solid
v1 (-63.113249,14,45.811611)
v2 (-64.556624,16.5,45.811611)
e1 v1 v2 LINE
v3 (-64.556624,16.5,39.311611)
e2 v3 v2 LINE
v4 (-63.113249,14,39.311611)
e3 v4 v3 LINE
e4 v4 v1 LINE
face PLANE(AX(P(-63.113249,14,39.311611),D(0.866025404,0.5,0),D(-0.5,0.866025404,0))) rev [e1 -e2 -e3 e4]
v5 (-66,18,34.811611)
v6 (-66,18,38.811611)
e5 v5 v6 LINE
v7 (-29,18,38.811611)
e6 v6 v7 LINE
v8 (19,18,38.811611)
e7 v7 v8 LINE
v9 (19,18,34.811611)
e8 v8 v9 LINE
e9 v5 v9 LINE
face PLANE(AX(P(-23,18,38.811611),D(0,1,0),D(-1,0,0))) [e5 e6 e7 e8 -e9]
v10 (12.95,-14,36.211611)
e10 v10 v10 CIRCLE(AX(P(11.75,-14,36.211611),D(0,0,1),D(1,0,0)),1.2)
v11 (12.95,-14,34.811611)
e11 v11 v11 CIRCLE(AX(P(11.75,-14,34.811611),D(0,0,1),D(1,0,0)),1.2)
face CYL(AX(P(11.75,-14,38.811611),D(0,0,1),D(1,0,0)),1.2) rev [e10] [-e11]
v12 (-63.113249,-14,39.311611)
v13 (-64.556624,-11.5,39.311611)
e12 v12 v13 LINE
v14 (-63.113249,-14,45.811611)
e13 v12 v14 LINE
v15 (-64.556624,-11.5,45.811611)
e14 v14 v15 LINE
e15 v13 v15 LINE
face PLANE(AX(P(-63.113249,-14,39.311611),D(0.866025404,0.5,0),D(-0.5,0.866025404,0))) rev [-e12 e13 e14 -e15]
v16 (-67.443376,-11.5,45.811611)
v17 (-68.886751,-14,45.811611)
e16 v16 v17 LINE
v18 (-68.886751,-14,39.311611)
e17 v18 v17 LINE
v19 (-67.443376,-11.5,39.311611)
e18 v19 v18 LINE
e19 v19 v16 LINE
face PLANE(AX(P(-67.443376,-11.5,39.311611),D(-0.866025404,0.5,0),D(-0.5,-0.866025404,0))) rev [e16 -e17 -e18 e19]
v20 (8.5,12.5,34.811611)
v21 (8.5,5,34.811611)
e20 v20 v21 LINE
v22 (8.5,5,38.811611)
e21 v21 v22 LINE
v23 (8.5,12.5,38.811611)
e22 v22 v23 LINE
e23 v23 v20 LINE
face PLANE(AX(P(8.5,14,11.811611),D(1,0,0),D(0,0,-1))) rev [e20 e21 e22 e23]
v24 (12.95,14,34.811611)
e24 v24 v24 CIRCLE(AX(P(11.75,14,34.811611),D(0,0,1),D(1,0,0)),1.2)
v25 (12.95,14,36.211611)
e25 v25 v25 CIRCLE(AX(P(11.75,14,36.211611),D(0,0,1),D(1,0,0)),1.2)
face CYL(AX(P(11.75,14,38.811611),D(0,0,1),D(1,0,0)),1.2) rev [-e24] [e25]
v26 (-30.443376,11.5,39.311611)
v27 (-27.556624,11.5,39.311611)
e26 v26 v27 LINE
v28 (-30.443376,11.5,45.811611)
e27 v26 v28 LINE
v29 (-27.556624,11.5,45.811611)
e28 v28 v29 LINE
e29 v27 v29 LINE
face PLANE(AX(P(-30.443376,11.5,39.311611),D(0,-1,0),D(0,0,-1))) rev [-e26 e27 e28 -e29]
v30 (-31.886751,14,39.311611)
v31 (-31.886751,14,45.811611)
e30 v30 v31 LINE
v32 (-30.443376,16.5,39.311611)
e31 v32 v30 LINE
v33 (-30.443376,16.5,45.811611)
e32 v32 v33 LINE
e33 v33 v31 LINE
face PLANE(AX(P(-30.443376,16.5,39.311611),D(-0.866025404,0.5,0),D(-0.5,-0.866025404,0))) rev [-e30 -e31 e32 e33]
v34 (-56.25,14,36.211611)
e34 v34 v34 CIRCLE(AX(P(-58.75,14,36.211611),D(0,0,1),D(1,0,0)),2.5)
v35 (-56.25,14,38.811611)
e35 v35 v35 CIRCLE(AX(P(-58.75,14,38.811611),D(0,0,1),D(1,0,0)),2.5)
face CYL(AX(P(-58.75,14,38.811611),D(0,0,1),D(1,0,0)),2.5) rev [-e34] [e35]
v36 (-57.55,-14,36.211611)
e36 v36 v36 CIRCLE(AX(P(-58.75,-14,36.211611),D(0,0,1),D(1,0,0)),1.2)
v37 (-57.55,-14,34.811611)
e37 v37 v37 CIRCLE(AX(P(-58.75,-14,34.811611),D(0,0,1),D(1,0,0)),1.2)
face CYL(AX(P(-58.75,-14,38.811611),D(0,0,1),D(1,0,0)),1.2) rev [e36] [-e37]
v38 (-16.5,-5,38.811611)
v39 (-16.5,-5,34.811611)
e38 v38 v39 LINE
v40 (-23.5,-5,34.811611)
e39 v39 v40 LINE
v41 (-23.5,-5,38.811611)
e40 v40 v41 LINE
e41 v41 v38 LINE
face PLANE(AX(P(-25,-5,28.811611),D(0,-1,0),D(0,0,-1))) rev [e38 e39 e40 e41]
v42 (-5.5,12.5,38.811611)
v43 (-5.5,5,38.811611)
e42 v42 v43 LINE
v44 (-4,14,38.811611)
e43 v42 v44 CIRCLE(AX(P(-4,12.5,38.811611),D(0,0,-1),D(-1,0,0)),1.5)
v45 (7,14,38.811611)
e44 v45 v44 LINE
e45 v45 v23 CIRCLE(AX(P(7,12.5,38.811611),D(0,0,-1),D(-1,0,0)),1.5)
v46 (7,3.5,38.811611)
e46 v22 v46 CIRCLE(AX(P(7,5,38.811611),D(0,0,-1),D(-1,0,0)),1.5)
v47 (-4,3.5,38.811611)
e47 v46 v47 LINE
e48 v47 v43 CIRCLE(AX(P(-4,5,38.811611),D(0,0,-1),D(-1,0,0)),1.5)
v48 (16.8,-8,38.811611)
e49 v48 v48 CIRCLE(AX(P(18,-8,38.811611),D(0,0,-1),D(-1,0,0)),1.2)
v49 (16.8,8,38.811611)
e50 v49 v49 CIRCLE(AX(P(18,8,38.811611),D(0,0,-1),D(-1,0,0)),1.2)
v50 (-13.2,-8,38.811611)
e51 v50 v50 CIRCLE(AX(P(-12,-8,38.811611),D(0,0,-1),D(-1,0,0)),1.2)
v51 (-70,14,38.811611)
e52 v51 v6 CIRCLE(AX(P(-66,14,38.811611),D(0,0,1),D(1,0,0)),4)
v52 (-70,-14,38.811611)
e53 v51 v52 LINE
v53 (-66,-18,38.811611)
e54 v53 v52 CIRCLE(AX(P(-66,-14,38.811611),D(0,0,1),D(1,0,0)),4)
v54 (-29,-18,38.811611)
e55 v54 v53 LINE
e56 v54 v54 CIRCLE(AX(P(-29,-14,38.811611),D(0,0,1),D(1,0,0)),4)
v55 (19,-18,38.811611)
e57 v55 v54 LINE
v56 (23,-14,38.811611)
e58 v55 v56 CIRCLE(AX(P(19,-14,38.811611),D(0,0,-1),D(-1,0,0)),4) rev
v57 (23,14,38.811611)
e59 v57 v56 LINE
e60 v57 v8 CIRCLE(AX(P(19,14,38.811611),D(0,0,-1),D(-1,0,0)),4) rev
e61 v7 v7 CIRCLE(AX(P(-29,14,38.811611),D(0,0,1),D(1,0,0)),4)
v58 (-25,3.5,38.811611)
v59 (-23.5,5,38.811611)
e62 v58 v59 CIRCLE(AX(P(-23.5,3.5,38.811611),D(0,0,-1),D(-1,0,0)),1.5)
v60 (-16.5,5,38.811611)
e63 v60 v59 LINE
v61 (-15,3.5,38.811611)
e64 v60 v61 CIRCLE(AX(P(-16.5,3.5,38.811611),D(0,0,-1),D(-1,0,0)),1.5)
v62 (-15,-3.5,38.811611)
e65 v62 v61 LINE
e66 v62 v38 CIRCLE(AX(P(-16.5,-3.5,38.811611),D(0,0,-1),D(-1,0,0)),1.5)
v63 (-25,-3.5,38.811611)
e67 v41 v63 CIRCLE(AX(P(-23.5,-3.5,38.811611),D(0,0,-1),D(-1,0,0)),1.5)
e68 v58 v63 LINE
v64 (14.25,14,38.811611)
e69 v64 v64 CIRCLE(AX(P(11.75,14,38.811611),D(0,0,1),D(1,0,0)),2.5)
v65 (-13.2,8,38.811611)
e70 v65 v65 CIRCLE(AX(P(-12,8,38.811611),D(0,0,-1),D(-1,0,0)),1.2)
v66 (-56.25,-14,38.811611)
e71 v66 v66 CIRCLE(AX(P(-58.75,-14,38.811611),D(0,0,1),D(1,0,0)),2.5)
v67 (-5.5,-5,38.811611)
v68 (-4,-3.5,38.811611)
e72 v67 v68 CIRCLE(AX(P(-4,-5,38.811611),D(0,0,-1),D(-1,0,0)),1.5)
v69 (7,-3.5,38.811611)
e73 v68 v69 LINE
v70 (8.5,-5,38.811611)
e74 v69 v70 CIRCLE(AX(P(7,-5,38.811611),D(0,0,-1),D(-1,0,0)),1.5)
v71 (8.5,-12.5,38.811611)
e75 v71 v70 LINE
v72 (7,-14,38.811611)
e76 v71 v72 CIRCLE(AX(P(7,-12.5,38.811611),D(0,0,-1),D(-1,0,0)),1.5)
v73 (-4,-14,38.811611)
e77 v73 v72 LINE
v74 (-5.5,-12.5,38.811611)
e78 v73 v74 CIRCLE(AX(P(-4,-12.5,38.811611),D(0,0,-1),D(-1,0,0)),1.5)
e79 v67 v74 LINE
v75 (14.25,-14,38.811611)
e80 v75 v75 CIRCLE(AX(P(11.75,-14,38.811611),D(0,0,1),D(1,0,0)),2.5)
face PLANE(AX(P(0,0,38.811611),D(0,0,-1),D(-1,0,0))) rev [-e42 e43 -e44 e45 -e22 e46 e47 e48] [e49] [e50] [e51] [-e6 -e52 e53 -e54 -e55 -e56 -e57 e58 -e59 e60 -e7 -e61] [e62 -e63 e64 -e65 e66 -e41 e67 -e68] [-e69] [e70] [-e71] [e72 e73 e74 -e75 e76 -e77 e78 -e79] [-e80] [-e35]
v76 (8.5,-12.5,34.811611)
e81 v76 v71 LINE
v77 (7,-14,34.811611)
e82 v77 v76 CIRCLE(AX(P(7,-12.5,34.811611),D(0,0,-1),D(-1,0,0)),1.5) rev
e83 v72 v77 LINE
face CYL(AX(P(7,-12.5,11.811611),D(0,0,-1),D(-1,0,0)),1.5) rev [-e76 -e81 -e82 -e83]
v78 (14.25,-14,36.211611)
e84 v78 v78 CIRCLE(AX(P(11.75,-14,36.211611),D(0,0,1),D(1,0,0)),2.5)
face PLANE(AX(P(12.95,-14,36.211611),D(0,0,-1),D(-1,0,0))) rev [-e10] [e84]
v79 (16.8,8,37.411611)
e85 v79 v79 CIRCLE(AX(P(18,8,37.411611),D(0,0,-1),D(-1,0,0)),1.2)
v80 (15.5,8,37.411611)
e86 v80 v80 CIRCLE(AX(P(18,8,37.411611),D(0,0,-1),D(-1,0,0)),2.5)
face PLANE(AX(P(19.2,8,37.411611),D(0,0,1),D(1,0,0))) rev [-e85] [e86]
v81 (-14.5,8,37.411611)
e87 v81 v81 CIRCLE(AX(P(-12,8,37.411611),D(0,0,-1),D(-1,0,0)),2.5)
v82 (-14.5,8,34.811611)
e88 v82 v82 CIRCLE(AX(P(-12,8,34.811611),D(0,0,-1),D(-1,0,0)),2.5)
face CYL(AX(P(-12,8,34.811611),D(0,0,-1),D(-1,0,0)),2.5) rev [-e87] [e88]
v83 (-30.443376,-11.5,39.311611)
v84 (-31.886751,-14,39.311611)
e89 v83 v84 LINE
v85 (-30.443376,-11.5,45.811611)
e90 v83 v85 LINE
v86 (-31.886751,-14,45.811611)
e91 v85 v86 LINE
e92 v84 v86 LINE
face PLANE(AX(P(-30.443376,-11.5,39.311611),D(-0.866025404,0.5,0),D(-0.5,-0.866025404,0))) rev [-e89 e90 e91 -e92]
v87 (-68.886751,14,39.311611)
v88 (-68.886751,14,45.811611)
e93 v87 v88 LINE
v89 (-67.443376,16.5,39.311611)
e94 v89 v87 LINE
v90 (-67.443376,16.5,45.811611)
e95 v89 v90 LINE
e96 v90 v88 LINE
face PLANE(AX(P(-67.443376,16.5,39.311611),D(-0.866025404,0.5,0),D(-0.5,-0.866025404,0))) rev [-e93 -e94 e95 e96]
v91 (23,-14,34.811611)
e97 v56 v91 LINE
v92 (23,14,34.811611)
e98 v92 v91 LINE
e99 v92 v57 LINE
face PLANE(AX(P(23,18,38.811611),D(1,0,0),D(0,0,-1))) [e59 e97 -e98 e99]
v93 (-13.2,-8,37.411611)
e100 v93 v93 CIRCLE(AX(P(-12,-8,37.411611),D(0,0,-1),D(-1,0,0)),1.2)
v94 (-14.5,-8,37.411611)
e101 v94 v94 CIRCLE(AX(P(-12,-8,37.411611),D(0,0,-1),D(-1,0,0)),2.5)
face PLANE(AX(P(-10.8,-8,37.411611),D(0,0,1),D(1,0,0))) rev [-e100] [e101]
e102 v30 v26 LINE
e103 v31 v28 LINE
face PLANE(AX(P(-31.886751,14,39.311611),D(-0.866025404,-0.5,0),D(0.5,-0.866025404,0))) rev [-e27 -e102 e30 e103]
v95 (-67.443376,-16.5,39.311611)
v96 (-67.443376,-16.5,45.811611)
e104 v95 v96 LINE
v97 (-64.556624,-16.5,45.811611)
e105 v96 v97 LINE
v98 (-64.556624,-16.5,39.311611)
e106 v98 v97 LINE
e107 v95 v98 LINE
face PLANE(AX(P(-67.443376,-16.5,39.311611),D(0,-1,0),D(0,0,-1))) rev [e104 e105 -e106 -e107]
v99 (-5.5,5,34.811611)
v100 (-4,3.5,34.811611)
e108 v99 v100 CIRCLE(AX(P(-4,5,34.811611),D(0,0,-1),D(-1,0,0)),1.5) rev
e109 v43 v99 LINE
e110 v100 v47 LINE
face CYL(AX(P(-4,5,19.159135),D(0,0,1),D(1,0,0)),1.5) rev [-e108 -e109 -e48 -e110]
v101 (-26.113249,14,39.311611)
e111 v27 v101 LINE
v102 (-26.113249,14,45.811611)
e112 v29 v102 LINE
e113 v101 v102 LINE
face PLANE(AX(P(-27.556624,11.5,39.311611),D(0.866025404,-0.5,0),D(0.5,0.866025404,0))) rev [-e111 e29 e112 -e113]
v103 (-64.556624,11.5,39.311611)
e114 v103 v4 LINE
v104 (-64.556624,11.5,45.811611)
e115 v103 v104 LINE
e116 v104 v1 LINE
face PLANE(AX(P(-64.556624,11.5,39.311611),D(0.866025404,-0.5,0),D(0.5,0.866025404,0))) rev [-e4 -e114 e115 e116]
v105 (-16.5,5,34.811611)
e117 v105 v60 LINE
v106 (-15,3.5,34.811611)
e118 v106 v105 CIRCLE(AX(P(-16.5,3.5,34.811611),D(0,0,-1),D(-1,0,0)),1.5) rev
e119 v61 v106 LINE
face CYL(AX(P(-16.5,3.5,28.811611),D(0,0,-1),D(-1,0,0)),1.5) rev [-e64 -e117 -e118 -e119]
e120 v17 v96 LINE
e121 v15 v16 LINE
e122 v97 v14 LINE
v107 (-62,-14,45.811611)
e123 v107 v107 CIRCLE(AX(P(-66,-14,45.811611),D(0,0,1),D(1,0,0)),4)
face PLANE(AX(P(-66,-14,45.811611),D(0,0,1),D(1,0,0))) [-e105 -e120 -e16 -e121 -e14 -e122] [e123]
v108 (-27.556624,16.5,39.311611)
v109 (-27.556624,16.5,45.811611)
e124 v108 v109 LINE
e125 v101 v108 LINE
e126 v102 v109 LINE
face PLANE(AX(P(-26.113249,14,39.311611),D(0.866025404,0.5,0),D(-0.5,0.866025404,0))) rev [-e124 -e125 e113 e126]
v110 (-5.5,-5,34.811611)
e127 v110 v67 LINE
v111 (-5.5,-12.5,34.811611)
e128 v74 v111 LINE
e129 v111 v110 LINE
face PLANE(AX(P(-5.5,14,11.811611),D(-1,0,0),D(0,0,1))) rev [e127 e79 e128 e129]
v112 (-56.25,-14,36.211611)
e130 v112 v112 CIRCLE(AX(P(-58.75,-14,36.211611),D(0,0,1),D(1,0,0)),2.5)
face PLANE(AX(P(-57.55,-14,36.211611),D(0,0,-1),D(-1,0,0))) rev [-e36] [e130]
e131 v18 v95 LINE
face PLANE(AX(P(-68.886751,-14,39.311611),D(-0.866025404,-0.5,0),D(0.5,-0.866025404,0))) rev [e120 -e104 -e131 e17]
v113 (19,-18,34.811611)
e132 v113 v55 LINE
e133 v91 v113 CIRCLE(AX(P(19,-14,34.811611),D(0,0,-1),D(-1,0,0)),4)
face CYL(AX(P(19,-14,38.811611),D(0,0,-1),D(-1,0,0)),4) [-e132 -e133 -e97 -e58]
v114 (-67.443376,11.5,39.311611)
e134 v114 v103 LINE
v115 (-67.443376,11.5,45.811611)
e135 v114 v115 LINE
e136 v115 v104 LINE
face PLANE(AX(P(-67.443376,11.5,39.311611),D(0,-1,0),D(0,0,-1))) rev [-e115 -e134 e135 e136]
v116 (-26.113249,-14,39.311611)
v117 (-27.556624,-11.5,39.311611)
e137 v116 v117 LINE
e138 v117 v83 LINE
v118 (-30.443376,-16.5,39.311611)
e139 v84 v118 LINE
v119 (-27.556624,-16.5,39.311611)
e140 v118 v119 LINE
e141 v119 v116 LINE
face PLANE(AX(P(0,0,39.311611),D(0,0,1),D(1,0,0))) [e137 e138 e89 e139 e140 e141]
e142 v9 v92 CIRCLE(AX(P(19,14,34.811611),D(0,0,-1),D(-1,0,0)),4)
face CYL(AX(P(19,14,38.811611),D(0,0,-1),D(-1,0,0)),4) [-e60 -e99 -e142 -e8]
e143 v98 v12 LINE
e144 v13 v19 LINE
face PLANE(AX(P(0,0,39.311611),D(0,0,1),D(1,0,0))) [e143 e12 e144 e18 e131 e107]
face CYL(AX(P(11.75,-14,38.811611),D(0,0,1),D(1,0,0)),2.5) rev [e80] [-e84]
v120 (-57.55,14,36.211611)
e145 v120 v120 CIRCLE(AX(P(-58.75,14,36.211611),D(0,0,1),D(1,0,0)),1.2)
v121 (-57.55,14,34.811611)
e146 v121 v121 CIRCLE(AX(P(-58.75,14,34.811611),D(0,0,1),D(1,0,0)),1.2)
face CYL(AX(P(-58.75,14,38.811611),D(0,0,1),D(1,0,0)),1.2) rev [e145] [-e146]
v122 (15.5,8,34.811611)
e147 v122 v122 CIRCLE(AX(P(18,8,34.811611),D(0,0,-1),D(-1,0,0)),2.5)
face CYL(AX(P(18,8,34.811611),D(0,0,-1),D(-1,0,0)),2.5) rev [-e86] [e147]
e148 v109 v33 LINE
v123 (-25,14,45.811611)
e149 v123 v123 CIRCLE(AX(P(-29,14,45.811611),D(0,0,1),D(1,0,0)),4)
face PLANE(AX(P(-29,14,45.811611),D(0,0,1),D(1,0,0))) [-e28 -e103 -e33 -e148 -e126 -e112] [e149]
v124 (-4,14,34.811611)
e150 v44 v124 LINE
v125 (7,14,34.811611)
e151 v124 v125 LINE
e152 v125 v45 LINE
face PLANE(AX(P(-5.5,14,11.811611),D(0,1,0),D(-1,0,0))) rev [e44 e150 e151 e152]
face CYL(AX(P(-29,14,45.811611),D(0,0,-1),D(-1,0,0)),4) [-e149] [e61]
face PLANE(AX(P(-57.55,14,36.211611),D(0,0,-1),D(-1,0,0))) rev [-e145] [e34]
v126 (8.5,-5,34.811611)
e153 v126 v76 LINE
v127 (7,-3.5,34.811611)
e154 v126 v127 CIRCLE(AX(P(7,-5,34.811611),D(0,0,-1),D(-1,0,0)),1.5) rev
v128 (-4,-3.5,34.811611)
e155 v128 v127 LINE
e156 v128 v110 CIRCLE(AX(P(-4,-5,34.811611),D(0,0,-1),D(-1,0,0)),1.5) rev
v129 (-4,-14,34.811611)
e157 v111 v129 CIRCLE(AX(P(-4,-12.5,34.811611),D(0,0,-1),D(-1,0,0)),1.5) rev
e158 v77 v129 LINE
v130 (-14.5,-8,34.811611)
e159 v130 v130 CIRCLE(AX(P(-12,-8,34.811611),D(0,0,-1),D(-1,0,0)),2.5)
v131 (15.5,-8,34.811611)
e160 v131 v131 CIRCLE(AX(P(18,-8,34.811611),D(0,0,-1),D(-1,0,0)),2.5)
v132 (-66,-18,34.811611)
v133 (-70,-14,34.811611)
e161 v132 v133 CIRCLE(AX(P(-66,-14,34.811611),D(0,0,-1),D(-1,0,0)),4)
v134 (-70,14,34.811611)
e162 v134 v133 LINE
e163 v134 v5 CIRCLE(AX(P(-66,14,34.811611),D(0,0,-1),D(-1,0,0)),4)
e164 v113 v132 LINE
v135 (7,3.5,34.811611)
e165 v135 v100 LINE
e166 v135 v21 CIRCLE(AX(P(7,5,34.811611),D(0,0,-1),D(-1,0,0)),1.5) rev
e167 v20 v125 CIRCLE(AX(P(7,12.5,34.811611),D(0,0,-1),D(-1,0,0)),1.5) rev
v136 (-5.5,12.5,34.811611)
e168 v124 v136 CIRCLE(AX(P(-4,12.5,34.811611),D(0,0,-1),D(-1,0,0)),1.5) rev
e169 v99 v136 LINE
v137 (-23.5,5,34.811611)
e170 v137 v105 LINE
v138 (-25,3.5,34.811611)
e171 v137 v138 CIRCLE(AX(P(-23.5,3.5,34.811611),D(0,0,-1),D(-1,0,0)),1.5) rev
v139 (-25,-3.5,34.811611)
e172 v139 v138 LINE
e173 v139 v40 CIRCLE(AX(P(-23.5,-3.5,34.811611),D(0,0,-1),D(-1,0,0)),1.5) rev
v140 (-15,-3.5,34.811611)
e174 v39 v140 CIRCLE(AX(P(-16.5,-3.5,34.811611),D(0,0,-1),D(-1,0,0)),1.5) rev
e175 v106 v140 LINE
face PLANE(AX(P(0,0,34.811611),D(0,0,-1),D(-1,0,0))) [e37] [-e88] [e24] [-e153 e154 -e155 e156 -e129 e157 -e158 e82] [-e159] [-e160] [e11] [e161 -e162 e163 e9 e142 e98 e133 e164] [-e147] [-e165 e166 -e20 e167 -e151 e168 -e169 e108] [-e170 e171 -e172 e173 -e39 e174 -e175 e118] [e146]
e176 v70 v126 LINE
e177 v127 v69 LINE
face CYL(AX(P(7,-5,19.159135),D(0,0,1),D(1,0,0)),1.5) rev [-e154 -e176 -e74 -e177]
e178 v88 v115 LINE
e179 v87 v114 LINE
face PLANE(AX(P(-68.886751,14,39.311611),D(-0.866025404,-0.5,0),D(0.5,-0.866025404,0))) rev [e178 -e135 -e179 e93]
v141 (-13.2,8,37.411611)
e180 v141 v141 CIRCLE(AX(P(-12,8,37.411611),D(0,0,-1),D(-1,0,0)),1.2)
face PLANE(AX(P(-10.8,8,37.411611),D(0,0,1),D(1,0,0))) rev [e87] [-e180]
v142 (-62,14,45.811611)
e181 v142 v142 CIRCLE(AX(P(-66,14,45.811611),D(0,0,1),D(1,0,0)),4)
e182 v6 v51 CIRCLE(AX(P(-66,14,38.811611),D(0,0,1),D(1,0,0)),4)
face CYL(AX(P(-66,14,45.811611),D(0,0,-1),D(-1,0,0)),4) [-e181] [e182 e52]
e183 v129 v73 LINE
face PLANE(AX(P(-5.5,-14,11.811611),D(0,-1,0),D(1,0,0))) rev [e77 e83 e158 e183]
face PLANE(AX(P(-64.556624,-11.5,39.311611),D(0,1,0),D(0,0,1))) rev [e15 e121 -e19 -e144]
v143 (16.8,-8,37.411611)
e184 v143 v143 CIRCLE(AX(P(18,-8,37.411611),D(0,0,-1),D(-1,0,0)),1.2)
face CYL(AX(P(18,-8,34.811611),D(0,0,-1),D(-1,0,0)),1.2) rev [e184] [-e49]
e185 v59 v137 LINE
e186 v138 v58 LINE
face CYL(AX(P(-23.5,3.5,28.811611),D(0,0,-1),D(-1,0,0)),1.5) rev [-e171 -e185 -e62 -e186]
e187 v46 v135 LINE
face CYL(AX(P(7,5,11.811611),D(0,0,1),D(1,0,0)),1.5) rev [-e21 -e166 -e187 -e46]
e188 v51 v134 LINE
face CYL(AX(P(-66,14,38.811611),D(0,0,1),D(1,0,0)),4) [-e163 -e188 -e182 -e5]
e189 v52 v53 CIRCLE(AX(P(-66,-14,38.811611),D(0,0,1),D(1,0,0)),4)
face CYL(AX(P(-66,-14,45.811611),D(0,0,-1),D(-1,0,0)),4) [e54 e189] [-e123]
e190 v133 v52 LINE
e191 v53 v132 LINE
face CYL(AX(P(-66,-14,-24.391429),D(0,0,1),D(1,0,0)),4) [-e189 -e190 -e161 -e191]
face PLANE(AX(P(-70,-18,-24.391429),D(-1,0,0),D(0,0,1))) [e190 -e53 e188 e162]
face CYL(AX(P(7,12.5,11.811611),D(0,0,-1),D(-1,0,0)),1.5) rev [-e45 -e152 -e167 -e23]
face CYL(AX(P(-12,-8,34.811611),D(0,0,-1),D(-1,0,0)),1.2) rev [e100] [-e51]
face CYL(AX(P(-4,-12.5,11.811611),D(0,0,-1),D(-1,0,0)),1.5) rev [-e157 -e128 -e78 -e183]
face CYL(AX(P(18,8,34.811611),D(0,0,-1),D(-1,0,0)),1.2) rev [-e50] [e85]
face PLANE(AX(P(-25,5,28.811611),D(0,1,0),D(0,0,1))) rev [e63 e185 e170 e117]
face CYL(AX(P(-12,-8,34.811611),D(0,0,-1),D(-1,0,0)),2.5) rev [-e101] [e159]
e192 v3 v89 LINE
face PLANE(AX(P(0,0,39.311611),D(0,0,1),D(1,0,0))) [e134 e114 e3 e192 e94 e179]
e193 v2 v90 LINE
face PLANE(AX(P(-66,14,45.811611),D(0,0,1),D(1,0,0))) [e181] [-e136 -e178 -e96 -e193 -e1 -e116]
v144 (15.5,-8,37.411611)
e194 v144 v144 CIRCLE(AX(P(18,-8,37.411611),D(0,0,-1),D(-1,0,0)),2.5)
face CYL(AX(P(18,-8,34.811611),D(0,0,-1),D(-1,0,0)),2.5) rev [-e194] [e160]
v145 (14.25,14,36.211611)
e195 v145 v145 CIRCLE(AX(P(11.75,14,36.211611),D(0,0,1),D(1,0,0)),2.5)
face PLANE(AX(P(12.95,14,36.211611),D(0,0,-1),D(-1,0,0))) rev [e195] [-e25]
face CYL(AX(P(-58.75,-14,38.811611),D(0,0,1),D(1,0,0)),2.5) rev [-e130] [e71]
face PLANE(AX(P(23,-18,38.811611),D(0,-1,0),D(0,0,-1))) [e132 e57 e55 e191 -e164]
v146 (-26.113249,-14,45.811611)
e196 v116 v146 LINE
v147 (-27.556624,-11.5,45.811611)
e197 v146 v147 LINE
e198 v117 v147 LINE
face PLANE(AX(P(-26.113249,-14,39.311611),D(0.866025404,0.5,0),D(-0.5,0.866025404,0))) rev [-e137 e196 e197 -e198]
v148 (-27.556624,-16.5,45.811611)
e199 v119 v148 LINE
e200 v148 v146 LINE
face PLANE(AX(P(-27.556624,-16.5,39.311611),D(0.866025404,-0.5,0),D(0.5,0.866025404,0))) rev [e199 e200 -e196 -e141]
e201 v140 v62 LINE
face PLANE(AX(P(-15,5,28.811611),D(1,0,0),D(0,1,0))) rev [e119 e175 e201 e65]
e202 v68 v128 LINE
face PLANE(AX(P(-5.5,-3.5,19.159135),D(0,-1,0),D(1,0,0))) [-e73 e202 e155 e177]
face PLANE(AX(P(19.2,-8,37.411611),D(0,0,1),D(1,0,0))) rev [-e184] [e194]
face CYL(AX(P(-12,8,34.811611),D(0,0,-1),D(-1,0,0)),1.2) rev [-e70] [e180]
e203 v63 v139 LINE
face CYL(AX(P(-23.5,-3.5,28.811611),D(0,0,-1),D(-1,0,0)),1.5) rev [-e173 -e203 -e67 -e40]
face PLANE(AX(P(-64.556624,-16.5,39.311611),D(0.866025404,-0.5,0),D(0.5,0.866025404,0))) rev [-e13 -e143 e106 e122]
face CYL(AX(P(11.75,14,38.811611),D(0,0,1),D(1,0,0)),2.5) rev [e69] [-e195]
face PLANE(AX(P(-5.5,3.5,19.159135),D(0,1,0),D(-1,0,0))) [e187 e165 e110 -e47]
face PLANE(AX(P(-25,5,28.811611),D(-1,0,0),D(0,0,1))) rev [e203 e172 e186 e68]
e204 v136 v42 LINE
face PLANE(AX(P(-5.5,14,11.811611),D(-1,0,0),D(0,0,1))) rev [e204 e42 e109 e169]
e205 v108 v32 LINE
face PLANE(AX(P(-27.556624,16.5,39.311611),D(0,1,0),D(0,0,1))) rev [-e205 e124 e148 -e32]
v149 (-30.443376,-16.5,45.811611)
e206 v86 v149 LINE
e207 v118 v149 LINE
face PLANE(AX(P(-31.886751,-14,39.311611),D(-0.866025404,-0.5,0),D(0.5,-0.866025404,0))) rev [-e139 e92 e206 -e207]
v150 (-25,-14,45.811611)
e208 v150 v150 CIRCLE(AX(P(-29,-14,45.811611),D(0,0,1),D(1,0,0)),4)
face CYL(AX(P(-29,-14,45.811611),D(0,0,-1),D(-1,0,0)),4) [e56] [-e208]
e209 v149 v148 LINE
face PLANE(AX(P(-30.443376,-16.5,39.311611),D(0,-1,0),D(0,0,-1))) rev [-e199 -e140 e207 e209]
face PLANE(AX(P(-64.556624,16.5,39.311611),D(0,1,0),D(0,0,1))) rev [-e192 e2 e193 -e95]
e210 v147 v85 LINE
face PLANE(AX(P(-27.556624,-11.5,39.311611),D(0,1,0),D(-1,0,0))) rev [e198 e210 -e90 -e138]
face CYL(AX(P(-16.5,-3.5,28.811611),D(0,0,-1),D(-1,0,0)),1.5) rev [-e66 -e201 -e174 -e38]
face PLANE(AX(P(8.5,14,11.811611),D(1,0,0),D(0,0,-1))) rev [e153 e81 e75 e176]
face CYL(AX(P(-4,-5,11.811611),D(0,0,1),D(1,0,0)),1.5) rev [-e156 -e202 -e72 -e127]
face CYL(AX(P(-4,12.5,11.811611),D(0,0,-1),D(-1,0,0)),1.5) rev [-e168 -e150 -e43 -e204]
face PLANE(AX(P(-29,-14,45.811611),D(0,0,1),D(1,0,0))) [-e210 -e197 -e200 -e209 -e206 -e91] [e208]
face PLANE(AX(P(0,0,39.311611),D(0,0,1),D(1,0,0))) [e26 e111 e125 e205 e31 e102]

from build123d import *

# Parameters (mm, degrees)
SKETCH1_W                                        = 46
SKETCH1_H                                        = 36
BOSS_EXTRUDE1_DEPTH                              = 4
CBORE_FOR_M2_PAN_HEAD_MACHINE_SCREW1_D           = 2.4
CBORE_FOR_M2_PAN_HEAD_MACHINE_SCREW1_CBORE_D     = 5
CBORE_FOR_M2_PAN_HEAD_MACHINE_SCREW1_CBORE_DEPTH = 2.6
SKETCH6_W                                        = 47
SKETCH6_H                                        = 36
BOSS_EXTRUDE2_DEPTH                              = 4
SKETCH7_R                                        = 4
BOSS_EXTRUDE3_DEPTH                              = 7
CUT_EXTRUDE3_DEPTH                               = 6.5
FILLET3_R                                        = 4
SKETCH13_W                                       = 14
SKETCH13_H                                       = 28
CUT_EXTRUDE5_DEPTH                               = 27
SKETCH16_W                                       = 14
SKETCH16_H                                       = 7
BOSS_EXTRUDE4_DEPTH                              = 4
SKETCH17_W                                       = 10
SKETCH17_H                                       = 10
CUT_EXTRUDE6_DEPTH                               = 10
FILLET4_R                                        = 1.5
CBORE_START                                      = 36.211611197
CBORE_FOR_M2_PAN_HEAD_MACHINE_SCREW2_OUT_R       = 2.5
CBORE_FOR_M2_PAN_HEAD_MACHINE_SCREW2_DEPTH       = 2.6
CBORE_START_2                                    = 34.811611197
CBORE_FOR_M2_PAN_HEAD_MACHINE_SCREW2_2_O_R       = 1.2
CBORE_FOR_M2_PAN_HEAD_MACHINE_SCREW2_2_DEPTH     = 1.4


# Read off the part's stored shape, not the designer's step: CBORE for M2 Pan Head Machine Screw2
with BuildPart() as part:
    # Sketch1 → Boss-Extrude1 (new body)
    with BuildSketch(Plane(origin=(0, 0, 34.811611197), x_dir=(-1, 0, 0), z_dir=(0, 0, -1))):
        Rectangle(SKETCH1_W, SKETCH1_H)
    extrude(amount=-BOSS_EXTRUDE1_DEPTH)

    # CBORE for M2 Pan Head Machine Screw1 (through all)
    with Locations(Plane(origin=(0, 0, 34.811611197), x_dir=(-1, 0, 0), z_dir=(0, 0, -1))):
        with Locations((12, -8), (-18, -8), (-18, 8), (12, 8)):
            CounterBoreHole(CBORE_FOR_M2_PAN_HEAD_MACHINE_SCREW1_D / 2, CBORE_FOR_M2_PAN_HEAD_MACHINE_SCREW1_CBORE_D / 2, CBORE_FOR_M2_PAN_HEAD_MACHINE_SCREW1_CBORE_DEPTH)

    # Sketch6 → Boss-Extrude2 (add)
    with BuildSketch(Plane.XY.offset(38.811611197)):
        with Locations((-46.5, 0)):
            Rectangle(SKETCH6_W, SKETCH6_H)
    extrude(amount=-BOSS_EXTRUDE2_DEPTH)

    # Sketch7 → Boss-Extrude3 (add)
    with BuildSketch(Plane.XY.offset(38.811611197)):
        with Locations(Location((-66, 14, 0), (0, 0, 180))):
            Circle(SKETCH7_R)
        with Locations(Location((-29, 14, 0), (0, 0, 90))):
            Circle(SKETCH7_R)
        with Locations(Location((-66, -14, 0), (0, 0, 180))):
            Circle(SKETCH7_R)
        with Locations(Location((-29, -14, 0), (0, 0, 270))):
            Circle(SKETCH7_R)
    extrude(amount=BOSS_EXTRUDE3_DEPTH)

    # Sketch10 → Cut-Extrude3 (cut)
    with BuildSketch(Plane.XY.offset(45.811611197)):
        Polygon((-64.556624327, 16.5), (-67.443375673, 16.5), (-68.886751346, 14), (-67.443375673, 11.5), (-64.556624327, 11.5), (-63.113248654, 14), align=None)
        Polygon((-64.556624327, -11.5), (-67.443375673, -11.5), (-68.886751346, -14), (-67.443375673, -16.5), (-64.556624327, -16.5), (-63.113248654, -14), align=None)
        Polygon((-27.556624327, 16.5), (-30.443375673, 16.5), (-31.886751346, 14), (-30.443375673, 11.5), (-27.556624327, 11.5), (-26.113248654, 14), align=None)
        Polygon((-27.556624327, -11.5), (-30.443375673, -11.5), (-31.886751346, -14), (-30.443375673, -16.5), (-27.556624327, -16.5), (-26.113248654, -14), align=None)
    extrude(amount=-CUT_EXTRUDE3_DEPTH, mode=Mode.SUBTRACT)

    # Fillet3
    fillet3_edges = [part.edges().sort_by_distance(p)[0] for p in [
        (-70, -18, 36.811611197),
        (23, -18, 36.811611197),
        (23, 18, 36.811611197),
        (-70, 18, 36.811611197),
    ]]
    fillet(fillet3_edges, radius=FILLET3_R)

    # Sketch13 → Cut-Extrude5 (cut)
    with BuildSketch(Plane.XY.offset(38.811611197)):
        with Locations((1.5, 0)):
            Rectangle(SKETCH13_W, SKETCH13_H)
    extrude(amount=-CUT_EXTRUDE5_DEPTH, mode=Mode.SUBTRACT)

    # Sketch16 → Boss-Extrude4 (add)
    with BuildSketch(Plane.XY.offset(38.811611197)):
        with Locations((1.5, 0)):
            Rectangle(SKETCH16_W, SKETCH16_H)
    extrude(amount=-BOSS_EXTRUDE4_DEPTH)

    # Sketch17 → Cut-Extrude6 (cut)
    with BuildSketch(Plane.XY.offset(38.811611197)):
        with Locations((-20, 0)):
            Rectangle(SKETCH17_W, SKETCH17_H)
    extrude(amount=-CUT_EXTRUDE6_DEPTH, mode=Mode.SUBTRACT)

    # Fillet4
    fillet4_edges = [part.edges().sort_by_distance(p)[0] for p in [
        (-5.5, 14, 36.811611197),
        (8.5, 14, 36.811611197),
        (8.5, -14, 36.811611197),
        (-5.5, -14, 36.811611197),
        (8.5, -3.5, 36.811611197),
        (8.5, 3.5, 36.811611197),
        (-5.5, 3.5, 36.811611197),
        (-5.5, -3.5, 36.811611197),
        (-25, -5, 36.811611197),
        (-25, 5, 36.811611197),
        (-15, 5, 36.811611197),
        (-15, -5, 36.811611197),
    ]]
    fillet(fillet4_edges, radius=FILLET4_R)

    # CBORE for M2 Pan Head Machine Screw2 out → CBORE for M2 Pan Head Machine Screw2 (cut)
    with BuildSketch(Plane.XY.offset(CBORE_START)):
        with Locations((-58.75, 14)):
            Circle(CBORE_FOR_M2_PAN_HEAD_MACHINE_SCREW2_OUT_R)
        with Locations((11.75, -14)):
            Circle(CBORE_FOR_M2_PAN_HEAD_MACHINE_SCREW2_OUT_R)
        with Locations((-58.75, -14)):
            Circle(CBORE_FOR_M2_PAN_HEAD_MACHINE_SCREW2_OUT_R)
        with Locations((11.75, 14)):
            Circle(CBORE_FOR_M2_PAN_HEAD_MACHINE_SCREW2_OUT_R)
    extrude(amount=CBORE_FOR_M2_PAN_HEAD_MACHINE_SCREW2_DEPTH, mode=Mode.SUBTRACT)

    # CBORE for M2 Pan Head Machine Screw2 2 o → CBORE for M2 Pan Head Machine Screw2 2 (cut)
    with BuildSketch(Plane.XY.offset(CBORE_START_2)):
        with Locations((-58.75, 14)):
            Circle(CBORE_FOR_M2_PAN_HEAD_MACHINE_SCREW2_2_O_R)
        with Locations((11.75, -14)):
            Circle(CBORE_FOR_M2_PAN_HEAD_MACHINE_SCREW2_2_O_R)
        with Locations((-58.75, -14)):
            Circle(CBORE_FOR_M2_PAN_HEAD_MACHINE_SCREW2_2_O_R)
        with Locations((11.75, 14)):
            Circle(CBORE_FOR_M2_PAN_HEAD_MACHINE_SCREW2_2_O_R)
    extrude(amount=CBORE_FOR_M2_PAN_HEAD_MACHINE_SCREW2_2_DEPTH, mode=Mode.SUBTRACT)


solid = part.part
